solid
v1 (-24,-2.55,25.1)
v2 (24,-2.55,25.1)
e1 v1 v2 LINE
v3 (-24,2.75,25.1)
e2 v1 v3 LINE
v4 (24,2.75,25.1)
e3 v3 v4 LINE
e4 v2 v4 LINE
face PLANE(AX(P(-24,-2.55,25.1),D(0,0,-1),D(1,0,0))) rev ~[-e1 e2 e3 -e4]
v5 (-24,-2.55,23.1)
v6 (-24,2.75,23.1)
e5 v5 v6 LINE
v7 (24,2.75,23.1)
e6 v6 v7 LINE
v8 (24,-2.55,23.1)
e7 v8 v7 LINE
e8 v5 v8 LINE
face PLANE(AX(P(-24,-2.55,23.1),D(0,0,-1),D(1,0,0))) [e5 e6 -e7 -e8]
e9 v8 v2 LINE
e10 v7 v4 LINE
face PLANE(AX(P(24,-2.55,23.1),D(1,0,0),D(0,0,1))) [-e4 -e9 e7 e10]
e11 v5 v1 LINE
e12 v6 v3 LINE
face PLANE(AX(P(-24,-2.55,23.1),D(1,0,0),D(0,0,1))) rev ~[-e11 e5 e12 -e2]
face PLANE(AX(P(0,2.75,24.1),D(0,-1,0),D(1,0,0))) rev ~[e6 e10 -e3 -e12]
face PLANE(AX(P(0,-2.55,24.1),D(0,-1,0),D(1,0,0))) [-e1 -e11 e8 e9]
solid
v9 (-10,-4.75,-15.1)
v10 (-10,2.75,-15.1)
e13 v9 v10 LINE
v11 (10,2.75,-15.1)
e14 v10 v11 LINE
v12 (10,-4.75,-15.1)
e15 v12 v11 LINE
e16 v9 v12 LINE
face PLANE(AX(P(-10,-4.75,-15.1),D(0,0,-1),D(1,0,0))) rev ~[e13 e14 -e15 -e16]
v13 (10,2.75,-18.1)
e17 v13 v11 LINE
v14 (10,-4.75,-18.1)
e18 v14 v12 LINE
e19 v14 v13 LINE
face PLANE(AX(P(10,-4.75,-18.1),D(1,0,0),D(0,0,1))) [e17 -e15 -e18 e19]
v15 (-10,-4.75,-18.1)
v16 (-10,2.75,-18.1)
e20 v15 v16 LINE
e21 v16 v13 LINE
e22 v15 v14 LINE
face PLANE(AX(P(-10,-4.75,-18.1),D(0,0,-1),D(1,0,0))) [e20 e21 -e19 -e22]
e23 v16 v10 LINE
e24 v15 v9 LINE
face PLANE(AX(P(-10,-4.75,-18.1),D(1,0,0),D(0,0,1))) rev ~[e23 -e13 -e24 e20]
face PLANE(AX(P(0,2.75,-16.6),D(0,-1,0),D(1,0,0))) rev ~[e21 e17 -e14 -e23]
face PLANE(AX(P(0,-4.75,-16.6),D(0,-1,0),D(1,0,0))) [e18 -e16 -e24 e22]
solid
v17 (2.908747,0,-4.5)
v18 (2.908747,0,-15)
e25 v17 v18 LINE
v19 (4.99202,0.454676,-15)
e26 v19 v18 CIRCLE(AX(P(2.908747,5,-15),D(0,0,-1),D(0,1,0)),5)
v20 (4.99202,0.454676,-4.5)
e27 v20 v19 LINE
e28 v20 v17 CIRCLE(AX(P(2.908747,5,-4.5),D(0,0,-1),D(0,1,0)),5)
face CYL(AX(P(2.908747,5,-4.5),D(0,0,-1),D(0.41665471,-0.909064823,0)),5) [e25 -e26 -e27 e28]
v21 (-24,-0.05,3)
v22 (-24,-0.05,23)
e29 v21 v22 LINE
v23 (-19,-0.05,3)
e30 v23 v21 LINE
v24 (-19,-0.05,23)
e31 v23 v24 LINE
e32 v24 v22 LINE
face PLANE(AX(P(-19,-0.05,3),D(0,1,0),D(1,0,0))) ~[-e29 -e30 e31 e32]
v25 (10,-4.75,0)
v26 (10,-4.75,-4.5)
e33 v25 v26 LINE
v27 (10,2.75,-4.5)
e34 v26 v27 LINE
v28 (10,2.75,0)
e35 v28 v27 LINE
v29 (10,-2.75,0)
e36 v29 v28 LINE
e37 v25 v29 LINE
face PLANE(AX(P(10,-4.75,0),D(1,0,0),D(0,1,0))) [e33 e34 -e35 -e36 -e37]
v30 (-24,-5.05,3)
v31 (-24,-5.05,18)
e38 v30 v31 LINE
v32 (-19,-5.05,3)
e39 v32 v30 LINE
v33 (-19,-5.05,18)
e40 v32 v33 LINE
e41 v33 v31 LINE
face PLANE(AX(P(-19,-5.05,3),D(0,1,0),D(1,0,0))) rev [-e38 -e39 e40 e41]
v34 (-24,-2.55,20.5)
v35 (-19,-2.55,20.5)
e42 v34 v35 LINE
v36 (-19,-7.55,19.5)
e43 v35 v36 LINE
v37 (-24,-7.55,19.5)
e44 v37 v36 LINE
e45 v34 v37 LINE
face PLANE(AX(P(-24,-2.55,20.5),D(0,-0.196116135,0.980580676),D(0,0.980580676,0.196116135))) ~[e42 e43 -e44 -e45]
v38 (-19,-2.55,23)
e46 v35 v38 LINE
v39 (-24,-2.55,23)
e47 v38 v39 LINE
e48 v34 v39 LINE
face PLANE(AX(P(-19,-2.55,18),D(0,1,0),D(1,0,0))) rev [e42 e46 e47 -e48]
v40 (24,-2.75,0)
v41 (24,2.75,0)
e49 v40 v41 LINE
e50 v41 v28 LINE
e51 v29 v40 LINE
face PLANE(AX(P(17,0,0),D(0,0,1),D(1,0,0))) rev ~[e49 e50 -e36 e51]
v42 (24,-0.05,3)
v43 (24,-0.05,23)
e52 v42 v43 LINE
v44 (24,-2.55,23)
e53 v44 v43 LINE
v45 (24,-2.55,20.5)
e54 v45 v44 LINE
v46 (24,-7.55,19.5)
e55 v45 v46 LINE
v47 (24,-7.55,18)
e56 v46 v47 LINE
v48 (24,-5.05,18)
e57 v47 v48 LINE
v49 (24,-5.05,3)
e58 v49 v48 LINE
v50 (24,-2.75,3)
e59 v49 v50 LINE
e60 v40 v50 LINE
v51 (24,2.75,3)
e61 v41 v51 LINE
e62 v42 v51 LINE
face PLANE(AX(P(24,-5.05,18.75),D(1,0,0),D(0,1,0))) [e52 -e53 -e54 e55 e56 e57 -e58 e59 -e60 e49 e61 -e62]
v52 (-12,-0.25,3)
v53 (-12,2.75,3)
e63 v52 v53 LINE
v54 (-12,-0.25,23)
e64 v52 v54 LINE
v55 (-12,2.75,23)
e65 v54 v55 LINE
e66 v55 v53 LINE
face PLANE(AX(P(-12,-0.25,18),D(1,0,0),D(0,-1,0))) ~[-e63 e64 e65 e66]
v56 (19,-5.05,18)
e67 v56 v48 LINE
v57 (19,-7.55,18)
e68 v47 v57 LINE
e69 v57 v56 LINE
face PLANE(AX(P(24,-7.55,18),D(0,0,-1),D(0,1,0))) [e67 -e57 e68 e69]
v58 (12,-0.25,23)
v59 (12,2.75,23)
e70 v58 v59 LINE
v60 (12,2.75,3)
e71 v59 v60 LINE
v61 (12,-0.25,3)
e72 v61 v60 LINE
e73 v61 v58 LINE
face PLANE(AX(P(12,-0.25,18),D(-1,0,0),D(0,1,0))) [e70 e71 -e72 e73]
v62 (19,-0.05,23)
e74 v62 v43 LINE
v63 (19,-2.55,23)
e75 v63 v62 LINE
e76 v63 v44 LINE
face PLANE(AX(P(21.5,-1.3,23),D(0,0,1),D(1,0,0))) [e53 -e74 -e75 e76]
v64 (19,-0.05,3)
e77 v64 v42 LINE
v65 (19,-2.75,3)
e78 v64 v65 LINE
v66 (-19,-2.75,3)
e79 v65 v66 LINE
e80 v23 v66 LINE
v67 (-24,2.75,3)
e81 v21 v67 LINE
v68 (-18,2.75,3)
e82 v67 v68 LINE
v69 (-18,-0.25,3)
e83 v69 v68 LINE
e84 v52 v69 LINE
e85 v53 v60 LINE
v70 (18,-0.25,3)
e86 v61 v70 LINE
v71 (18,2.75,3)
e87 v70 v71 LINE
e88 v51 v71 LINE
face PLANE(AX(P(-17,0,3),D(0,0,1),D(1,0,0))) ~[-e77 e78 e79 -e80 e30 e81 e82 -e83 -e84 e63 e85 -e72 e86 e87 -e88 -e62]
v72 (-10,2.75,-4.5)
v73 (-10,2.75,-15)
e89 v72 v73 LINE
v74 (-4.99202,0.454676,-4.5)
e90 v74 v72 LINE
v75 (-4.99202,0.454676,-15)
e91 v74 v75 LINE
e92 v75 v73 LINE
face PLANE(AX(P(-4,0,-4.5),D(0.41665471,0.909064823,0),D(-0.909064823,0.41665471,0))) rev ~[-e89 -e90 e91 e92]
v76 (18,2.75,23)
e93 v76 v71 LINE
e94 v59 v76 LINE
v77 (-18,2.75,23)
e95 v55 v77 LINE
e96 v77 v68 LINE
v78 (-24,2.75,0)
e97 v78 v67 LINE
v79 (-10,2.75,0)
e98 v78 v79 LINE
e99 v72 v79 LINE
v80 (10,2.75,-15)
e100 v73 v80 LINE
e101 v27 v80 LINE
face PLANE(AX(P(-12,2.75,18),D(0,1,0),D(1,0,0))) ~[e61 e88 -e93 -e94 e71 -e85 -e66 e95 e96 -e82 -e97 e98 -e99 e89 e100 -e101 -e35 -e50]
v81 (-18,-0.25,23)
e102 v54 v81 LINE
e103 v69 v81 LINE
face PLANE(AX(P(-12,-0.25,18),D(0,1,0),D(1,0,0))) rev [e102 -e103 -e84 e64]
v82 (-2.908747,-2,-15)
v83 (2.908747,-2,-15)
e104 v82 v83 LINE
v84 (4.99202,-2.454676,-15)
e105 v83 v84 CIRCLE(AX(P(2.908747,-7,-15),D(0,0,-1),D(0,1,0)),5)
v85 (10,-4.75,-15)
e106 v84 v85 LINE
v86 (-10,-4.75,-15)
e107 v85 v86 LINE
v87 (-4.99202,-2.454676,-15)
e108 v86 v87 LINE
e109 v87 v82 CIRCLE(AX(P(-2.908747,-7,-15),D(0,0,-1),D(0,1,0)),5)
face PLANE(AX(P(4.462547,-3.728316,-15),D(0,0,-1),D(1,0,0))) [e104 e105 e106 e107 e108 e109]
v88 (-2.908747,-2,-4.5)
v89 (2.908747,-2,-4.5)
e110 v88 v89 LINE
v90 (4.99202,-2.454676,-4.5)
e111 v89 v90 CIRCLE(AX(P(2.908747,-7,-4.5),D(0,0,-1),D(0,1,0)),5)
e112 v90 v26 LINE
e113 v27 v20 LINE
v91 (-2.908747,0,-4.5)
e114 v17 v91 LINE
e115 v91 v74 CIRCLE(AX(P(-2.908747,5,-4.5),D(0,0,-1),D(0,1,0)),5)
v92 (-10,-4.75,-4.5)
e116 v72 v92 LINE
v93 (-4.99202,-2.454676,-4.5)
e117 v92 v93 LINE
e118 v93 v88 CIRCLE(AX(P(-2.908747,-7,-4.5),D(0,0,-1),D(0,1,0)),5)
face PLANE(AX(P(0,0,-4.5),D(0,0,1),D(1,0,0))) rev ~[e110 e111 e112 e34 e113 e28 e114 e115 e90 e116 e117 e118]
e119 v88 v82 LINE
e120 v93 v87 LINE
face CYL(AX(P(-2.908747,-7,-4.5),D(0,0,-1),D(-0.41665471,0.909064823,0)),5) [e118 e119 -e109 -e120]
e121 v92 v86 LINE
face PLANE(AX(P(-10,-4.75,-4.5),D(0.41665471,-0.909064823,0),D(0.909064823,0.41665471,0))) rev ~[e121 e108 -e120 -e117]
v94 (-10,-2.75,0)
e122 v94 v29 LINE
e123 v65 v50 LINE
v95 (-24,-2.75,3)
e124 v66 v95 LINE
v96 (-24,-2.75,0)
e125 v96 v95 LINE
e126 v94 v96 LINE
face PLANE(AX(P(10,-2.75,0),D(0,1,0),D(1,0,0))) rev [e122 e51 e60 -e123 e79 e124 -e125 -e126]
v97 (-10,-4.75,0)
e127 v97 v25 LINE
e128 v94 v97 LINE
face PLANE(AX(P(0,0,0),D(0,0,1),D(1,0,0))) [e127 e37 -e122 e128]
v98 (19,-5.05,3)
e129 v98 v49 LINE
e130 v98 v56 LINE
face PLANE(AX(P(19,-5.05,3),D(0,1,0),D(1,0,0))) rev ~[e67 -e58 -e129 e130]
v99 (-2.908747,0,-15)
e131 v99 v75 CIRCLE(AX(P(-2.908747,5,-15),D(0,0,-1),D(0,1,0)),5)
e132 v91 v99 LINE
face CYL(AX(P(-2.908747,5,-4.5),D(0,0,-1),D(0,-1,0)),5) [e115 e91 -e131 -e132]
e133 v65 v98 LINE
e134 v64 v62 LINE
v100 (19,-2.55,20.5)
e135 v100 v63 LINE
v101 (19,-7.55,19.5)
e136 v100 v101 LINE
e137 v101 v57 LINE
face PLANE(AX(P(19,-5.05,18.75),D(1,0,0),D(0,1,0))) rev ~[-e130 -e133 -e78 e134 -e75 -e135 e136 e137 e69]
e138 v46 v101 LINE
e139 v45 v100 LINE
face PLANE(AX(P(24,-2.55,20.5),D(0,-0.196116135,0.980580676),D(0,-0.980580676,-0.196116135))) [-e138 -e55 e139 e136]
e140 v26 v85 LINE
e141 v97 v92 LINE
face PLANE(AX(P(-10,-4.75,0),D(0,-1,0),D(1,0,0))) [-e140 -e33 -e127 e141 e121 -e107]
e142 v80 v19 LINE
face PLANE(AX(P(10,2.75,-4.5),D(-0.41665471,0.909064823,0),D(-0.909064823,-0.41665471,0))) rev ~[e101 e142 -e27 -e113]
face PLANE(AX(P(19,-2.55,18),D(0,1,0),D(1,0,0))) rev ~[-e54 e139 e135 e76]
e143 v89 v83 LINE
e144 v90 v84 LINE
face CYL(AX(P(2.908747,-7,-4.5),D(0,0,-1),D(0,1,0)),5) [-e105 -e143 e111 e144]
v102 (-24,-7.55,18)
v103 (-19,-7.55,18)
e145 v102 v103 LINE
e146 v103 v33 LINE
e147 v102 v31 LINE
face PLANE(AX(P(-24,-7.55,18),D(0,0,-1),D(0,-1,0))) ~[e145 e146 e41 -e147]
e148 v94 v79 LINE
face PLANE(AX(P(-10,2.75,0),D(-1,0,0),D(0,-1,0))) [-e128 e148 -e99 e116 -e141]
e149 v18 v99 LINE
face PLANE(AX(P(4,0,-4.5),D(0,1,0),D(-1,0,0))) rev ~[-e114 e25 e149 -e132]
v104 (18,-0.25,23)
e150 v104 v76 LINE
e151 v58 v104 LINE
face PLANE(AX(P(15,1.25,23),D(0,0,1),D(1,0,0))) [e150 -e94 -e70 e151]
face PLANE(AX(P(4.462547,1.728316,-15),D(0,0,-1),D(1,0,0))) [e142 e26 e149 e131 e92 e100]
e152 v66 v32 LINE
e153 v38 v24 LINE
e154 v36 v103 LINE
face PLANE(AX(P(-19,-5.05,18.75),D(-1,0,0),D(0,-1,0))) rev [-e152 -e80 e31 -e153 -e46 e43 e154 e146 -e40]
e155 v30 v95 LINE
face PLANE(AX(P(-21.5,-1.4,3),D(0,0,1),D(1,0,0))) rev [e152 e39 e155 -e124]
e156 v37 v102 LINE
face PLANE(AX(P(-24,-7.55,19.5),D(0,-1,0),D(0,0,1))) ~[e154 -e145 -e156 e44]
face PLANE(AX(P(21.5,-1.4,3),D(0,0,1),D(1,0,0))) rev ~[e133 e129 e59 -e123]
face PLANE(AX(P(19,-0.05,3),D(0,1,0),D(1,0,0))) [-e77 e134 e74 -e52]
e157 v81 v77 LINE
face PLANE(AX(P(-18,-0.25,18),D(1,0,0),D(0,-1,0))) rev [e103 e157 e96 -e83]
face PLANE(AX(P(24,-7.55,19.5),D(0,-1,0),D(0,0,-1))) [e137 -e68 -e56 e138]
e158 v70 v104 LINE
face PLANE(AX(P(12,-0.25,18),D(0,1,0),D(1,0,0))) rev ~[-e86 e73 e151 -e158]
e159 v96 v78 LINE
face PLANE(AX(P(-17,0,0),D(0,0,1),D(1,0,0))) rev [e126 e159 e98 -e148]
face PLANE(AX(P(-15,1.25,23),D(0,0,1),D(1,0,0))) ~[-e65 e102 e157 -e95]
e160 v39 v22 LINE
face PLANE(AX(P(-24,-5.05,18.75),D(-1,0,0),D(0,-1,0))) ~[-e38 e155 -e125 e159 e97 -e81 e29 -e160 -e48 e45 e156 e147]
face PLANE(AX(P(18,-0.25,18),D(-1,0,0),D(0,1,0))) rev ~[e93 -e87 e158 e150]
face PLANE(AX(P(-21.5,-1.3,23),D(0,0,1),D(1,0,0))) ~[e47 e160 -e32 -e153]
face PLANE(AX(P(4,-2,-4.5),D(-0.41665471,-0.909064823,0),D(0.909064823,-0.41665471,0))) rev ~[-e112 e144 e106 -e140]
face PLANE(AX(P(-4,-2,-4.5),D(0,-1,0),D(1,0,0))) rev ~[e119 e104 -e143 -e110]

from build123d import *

# Parameters (mm, degrees)
F0_W      = 14
F0_H      = 5.5
F1_DEPTH  = 3
F0_W_2    = 10
F0_H_2    = 2
F2_DEPTH  = 4.5
F4_DEPTH  = 10.5
F5_W      = 6
F5_H      = 3
F5_W_2    = 5
F5_H_2    = 2.7
F5_H_3    = 2.3
F6_DEPTH  = 15
F6_FACE_W = 6
F6_FACE_H = 3
F7_W      = 5
F7_H      = 2.5
F8_DEPTH  = 5
F10_DEPTH = 5
F12_R     = 5
F13_W     = 20
F13_H     = 3
F14_DEPTH = 7.5
F15_W     = 48
F15_H     = 2
F16_DEPTH = 5.3


# Not quite as in the source:
# - a feature names something its author has since deleted; it is built from what else it names


with BuildPart() as f1:
    # F0 (on Top) → F1 (new body)
    with BuildSketch(Plane.XY):
        with Locations((17, 0)):
            Rectangle(F0_W, F0_H)
        Polygon((0, -2.75), (10, -2.75), (10, 2.75), (-10, 2.75), (-10, -2.75), align=None)
    extrude(amount=F1_DEPTH)

    # F0 (on Top) → F2 (join)
    with BuildSketch(Plane.XY):
        Polygon((0, -2.75), (10, -2.75), (10, 2.75), (-10, 2.75), (-10, -2.75), align=None)
        with Locations((-5, -3.75)):
            Rectangle(F0_W_2, F0_H_2)
        with Locations((5, -3.75)):
            Rectangle(F0_W_2, F0_H_2)
    extrude(amount=-F2_DEPTH)

    # F3 (on face) → F4 (join)
    with BuildSketch(Plane(origin=(0, 0, -4.5), x_dir=(1, 0, 0), z_dir=(0, 0, -1))):
        Polygon((0, -2.75), (10, -2.75), (4, 0), (0, 0), align=None)
        Polygon((-10, -2.75), (0, -2.75), (0, 0), (-4, 0), align=None)
        Polygon((4, 2), (10, 4.75), (0, 4.75), (0, 2), align=None)
        Polygon((-4, 2), (0, 2), (0, 4.75), (-10, 4.75), align=None)
    extrude(amount=F4_DEPTH)

    # F5 (on face) → F6 (join)
    with BuildSketch(Plane.XY.offset(3)):
        with Locations((15, 1.25)):
            Rectangle(F5_W, F5_H)
        with Locations((21.5, -1.4)):
            Rectangle(F5_W_2, F5_H_2)
        with Locations((21.5, -3.9)):
            Rectangle(F5_W_2, F5_H_3)
    extrude(amount=F6_DEPTH)

    # F6_face (on face) + F7 (on face) → F8 (join)
    with BuildSketch(Plane(origin=(21.5, -2.55, 18), x_dir=(1, 0, 0), z_dir=(0, 0, 1))):
        with Locations((-6.5, 3.8)):
            Rectangle(F6_FACE_W, F6_FACE_H)
    with BuildSketch(Plane.XY.offset(18)):
        with Locations((21.5, -1.3)):
            Rectangle(F7_W, F7_H)
    extrude(amount=F8_DEPTH)

    # F9 (on face) → F10 (join)
    with BuildSketch(Plane.YZ.offset(24)):
        Polygon((-5.05, 18), (-2.55, 18), (-2.55, 19.5), (-7.55, 19.5), (-7.55, 18), align=None)
        Polygon((-7.55, 19.5), (-2.55, 19.5), (-2.55, 20.5), align=None)
    extrude(amount=-F10_DEPTH)

    # F11: F1 across plane


with BuildPart() as f1_1:
    add(f1.part)
    add(f1.part.mirror(Plane.YZ))

    # F12
    f12_edges = [f1_1.edges().sort_by_distance(p)[0] for p in [
        (-4, -2, -9.75),
        (4, -2, -9.75),
        (4, 0, -9.75),
        (-4, 0, -9.75),
    ]]
    fillet(f12_edges, radius=F12_R)


with BuildPart() as f14:
    # F13 (on face) → F14 (new body)
    with BuildSketch(Plane.XZ.offset(4.75)):
        with Locations((0, -16.6)):
            Rectangle(F13_W, F13_H)
    extrude(amount=-F14_DEPTH)


with BuildPart() as f16:
    # F15 (on face) → F16 (new body)
    with BuildSketch(Plane.XZ.offset(2.55)):
        with Locations((0, 24.1)):
            Rectangle(F15_W, F15_H)
    extrude(amount=-F16_DEPTH)


solid = Compound([f1_1.part, f14.part, f16.part])
